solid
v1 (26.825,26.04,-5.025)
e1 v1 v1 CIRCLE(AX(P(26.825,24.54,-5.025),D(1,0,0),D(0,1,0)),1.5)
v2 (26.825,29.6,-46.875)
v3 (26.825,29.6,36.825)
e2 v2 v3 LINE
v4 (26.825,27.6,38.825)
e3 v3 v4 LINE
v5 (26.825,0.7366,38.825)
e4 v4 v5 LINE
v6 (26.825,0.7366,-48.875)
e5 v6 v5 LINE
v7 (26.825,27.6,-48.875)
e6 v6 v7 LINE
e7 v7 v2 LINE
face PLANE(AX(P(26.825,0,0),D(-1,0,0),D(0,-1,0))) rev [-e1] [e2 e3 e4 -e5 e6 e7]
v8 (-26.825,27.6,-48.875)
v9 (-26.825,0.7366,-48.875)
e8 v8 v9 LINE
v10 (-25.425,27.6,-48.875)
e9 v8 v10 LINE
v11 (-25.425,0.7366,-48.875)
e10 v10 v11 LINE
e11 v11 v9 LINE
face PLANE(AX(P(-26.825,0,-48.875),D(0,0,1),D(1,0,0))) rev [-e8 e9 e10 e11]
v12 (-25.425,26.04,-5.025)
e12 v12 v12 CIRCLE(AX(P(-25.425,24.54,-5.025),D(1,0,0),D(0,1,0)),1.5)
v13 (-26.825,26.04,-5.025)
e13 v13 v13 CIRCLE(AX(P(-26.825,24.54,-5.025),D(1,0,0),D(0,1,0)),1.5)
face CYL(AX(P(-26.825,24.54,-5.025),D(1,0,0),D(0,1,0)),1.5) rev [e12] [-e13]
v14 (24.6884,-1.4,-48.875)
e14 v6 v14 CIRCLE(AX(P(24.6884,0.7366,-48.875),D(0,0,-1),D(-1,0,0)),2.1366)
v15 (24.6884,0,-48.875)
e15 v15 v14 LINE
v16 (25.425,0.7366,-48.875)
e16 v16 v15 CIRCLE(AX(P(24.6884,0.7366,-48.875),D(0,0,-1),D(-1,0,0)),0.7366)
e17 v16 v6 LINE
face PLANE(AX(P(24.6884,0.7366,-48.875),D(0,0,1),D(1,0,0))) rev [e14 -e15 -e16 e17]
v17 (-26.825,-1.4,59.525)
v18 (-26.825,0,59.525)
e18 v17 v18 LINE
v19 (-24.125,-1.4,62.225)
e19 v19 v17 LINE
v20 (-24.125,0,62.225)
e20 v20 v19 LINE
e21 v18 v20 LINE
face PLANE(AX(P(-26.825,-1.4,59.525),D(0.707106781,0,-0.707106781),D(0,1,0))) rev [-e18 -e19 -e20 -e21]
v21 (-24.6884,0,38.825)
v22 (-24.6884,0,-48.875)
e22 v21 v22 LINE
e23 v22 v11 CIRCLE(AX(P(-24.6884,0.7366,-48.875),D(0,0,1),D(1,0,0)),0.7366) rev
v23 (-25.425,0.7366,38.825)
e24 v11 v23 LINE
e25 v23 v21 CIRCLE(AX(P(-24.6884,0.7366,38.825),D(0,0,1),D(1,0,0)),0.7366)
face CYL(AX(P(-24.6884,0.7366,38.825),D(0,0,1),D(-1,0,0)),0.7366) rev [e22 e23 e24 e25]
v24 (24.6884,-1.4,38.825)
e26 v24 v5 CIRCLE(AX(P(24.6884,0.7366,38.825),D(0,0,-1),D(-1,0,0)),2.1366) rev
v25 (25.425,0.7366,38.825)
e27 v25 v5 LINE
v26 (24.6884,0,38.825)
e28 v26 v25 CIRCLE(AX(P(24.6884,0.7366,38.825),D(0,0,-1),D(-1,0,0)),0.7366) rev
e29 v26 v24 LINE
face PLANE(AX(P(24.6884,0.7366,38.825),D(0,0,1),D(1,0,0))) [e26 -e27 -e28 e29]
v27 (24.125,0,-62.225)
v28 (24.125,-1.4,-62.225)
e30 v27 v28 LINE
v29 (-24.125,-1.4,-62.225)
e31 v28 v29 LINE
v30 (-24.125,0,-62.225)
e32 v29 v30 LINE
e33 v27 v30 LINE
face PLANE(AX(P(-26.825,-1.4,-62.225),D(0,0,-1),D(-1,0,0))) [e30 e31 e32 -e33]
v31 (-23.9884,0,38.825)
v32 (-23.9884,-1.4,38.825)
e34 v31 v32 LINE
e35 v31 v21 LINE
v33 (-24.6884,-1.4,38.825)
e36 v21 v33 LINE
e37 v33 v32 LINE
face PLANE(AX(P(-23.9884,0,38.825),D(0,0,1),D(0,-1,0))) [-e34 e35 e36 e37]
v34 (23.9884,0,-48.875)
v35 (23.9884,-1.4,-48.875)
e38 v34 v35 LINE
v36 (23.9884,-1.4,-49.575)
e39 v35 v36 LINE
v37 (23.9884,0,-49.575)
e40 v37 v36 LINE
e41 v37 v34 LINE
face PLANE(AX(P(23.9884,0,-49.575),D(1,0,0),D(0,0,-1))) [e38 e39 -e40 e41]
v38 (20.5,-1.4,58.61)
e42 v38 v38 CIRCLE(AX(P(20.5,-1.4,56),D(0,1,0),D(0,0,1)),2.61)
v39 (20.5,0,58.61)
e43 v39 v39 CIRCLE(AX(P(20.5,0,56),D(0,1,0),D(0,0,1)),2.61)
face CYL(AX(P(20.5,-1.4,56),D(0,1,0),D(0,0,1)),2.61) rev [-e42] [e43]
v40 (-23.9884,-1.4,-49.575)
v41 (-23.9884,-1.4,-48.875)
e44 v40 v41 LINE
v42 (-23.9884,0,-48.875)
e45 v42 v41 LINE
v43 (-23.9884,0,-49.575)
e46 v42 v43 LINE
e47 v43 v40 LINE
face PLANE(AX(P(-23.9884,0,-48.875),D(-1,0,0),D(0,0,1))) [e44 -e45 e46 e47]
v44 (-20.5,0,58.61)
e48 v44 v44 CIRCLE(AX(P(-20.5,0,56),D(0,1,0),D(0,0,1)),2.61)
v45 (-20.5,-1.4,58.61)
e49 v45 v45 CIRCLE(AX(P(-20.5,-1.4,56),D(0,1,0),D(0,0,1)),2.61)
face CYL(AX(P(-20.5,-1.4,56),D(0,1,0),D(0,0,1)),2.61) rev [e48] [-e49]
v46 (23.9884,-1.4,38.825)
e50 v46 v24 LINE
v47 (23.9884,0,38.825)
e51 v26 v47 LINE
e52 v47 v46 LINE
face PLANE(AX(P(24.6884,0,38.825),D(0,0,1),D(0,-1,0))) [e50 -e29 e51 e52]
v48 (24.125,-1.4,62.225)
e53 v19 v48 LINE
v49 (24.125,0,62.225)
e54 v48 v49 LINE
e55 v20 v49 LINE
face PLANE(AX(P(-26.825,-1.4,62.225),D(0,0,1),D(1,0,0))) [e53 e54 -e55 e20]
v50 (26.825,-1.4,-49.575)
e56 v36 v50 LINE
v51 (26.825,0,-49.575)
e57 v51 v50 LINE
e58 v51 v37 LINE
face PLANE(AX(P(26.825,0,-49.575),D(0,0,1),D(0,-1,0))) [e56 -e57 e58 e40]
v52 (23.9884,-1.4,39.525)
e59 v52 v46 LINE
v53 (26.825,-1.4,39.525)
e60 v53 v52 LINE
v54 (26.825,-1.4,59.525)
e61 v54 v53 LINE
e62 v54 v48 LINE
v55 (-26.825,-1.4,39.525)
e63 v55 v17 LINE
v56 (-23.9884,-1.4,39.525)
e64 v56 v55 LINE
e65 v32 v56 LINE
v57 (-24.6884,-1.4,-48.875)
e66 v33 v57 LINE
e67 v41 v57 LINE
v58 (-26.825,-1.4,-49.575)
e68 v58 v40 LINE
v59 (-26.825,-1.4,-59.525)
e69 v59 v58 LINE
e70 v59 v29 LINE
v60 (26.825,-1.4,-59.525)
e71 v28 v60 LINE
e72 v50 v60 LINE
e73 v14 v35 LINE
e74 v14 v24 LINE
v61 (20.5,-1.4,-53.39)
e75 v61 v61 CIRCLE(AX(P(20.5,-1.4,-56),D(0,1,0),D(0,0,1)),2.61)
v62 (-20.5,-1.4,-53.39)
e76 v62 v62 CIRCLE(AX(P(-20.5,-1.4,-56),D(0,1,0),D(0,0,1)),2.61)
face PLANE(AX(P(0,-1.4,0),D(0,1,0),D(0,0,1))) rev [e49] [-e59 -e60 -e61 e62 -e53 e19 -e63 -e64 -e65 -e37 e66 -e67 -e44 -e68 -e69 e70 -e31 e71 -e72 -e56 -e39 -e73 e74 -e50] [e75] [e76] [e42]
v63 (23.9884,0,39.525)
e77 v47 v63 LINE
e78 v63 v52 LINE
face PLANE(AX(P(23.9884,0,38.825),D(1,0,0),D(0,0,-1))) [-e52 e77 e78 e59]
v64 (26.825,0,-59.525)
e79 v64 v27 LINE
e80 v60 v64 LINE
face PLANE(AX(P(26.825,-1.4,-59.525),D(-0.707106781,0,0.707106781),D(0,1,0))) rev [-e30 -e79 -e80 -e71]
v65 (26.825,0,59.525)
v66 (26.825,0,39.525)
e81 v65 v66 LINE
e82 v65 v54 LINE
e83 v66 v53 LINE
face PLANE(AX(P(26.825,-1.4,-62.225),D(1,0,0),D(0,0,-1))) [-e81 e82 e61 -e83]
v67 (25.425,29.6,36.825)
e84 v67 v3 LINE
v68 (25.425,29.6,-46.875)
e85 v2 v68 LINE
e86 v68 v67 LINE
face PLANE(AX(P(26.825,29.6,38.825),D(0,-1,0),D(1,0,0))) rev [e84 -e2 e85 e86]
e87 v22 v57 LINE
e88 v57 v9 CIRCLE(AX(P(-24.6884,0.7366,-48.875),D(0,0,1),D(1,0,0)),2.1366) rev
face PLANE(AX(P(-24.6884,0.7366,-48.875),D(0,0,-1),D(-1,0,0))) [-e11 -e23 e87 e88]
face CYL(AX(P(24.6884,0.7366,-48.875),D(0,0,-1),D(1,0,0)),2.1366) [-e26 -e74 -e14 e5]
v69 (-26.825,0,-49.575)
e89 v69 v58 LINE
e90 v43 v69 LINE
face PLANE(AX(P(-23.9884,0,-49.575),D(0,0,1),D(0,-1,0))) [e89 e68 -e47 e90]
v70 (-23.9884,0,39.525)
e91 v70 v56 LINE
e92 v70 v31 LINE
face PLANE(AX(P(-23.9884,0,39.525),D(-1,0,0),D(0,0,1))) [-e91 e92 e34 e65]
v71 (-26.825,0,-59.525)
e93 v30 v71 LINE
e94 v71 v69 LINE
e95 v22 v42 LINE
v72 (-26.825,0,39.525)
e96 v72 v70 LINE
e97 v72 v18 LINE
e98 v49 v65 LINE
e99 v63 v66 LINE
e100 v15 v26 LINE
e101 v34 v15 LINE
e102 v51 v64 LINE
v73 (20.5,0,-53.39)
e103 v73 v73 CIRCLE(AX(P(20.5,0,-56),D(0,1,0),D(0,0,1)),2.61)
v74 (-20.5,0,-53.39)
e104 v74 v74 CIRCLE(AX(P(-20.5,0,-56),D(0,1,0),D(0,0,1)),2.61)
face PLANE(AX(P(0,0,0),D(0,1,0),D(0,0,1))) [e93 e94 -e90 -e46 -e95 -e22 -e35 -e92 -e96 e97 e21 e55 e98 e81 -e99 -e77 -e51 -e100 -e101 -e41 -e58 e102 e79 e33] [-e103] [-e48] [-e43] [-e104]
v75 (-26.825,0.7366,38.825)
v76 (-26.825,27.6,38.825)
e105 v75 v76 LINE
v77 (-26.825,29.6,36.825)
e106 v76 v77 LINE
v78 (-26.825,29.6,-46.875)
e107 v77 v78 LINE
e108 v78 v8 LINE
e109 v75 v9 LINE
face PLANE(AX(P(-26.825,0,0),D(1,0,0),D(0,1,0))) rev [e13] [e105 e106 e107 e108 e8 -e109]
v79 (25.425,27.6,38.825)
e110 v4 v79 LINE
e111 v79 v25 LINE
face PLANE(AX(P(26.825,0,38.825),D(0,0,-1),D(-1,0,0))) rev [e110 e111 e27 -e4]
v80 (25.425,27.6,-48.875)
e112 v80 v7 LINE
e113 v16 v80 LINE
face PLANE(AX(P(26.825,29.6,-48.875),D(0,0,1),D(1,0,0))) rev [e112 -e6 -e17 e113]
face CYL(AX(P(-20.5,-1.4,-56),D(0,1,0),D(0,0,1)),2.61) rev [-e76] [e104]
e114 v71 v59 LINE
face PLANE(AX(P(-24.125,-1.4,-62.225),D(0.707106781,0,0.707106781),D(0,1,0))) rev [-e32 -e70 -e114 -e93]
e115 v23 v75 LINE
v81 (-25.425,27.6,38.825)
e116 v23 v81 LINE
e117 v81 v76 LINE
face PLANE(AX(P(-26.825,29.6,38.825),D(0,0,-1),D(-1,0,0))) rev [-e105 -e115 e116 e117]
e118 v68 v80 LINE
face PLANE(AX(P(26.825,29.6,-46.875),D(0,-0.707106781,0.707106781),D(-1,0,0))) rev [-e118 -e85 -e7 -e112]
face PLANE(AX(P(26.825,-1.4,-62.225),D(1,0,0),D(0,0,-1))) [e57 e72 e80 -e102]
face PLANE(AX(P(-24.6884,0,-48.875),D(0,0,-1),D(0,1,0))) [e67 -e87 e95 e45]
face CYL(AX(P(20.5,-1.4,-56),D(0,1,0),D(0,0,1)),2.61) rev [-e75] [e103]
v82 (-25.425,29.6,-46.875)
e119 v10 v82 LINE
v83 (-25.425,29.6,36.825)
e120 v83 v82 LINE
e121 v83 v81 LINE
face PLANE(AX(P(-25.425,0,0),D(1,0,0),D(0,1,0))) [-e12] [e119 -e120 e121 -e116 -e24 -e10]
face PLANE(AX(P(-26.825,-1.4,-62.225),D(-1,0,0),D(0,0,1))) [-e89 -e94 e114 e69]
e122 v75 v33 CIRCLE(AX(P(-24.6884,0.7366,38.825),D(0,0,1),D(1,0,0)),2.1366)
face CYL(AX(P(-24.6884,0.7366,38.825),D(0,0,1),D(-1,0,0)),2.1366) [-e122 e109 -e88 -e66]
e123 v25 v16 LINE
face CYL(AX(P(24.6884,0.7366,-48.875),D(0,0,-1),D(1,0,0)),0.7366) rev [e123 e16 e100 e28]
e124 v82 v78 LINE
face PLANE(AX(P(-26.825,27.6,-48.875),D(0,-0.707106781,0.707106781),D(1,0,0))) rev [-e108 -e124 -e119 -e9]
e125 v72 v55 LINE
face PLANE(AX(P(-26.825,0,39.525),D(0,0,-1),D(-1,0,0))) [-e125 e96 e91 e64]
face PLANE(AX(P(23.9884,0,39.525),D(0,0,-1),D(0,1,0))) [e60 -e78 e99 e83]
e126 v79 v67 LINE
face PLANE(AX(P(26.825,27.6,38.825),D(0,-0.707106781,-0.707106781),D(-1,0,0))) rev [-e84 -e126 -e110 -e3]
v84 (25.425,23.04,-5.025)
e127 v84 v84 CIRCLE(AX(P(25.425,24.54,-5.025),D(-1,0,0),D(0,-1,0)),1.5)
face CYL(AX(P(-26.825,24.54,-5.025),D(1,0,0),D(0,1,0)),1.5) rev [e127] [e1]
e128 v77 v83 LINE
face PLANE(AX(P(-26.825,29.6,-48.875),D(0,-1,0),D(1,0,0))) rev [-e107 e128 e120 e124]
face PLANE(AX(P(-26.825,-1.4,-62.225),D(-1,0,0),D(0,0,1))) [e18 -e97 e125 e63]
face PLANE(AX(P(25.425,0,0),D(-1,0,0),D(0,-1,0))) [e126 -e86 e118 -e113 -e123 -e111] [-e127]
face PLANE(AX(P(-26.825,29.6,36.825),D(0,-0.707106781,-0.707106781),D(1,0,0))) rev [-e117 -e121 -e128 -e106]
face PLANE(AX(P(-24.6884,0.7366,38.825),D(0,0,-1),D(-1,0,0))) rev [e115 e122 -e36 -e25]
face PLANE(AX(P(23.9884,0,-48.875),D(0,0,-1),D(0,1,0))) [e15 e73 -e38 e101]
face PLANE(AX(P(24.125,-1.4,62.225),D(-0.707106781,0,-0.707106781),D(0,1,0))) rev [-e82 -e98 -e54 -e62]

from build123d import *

# Parameters (mm, degrees)
SKETCH1_W                       = 53.65
SKETCH1_H                       = 124.45
SKETCH1_R                       = 2.61
BASE_FLANGE1_DEPTH              = 1.4
CHAMFER1_SIZE                   = 2.7
EDGE_FLANGE2_STRIP_W            = 7.0732
EDGE_FLANGE2_STRIP_H            = 1.4
EDGE_FLANGE2_STRIP_CUT_DEPTH    = 87.7
EDGE_FLANGE2_RELIEF_W           = 7.7732
EDGE_FLANGE2_RELIEF_H           = 0.7
EDGE_FLANGE2_RELIEF_CUT_DEPTH   = 1.4
EDGE_FLANGE2_STRIP_2_W          = 7.0732
EDGE_FLANGE2_STRIP_2_H          = 1.4
EDGE_FLANGE2_STRIP_CUT_2_DEPTH  = 87.7
EDGE_FLANGE2_RELIEF_2_W         = 7.7732
EDGE_FLANGE2_RELIEF_2_H         = 0.7
EDGE_FLANGE2_RELIEF_CUT_2_DEPTH = 1.4
EDGE_FLANGE2_DEPTH              = 87.7
EDGE_FLANGE2_BEND_DEPTH         = 87.7
CHAMFER2_SIZE                   = 2
SKETCH18_R                      = 1.5
CUT_EXTRUDE1_DEPTH              = 88.329451647


# Sheet-metal steps are written as plain solids
with BuildPart() as part:
    # Sketch1 → Base-Flange1 (new body)
    with BuildSketch(Plane(origin=(0, 0, 0), x_dir=(1, 0, 0), z_dir=(0, 1, 0))):
        Rectangle(SKETCH1_W, SKETCH1_H)
        with Locations(Location((-20.5, 56, 0), (0, 0, 270))):
            Circle(SKETCH1_R, mode=Mode.SUBTRACT)
        with Locations(Location((20.5, 56, 0), (0, 0, 270))):
            Circle(SKETCH1_R, mode=Mode.SUBTRACT)
        with Locations(Location((20.5, -56, 0), (0, 0, 270))):
            Circle(SKETCH1_R, mode=Mode.SUBTRACT)
        with Locations(Location((-20.5, -56, 0), (0, 0, 270))):
            Circle(SKETCH1_R, mode=Mode.SUBTRACT)
    extrude(amount=-BASE_FLANGE1_DEPTH)

    # Chamfer1
    chamfer1_edges = [part.edges().sort_by_distance(p)[0] for p in [
        (26.825, -0.7, 62.225),
        (-26.825, -0.7, 62.225),
        (-26.825, -0.7, -62.225),
        (26.825, -0.7, -62.225),
    ]]
    chamfer(chamfer1_edges, length=CHAMFER1_SIZE)

    # Edge-Flange2 strip (across the edge) → Edge-Flange2 strip cut (cut)
    with BuildSketch(Plane(origin=(26.825, 0, 38.825), x_dir=(-1, 0, 0), z_dir=(0, 0, -1))):
        with Locations((-1.4, -0.7)):
            Rectangle(EDGE_FLANGE2_STRIP_W, EDGE_FLANGE2_STRIP_H)
    extrude(amount=EDGE_FLANGE2_STRIP_CUT_DEPTH, mode=Mode.SUBTRACT)

    # Edge-Flange2 relief (on the sheet) → Edge-Flange2 relief cut (cut)
    with BuildSketch(Plane(origin=(24.6884, 0, 38.825), x_dir=(-1, 0, 0), z_dir=(0, 1, 0))):
        with Locations((-3.1866, 0.35)):
            Rectangle(EDGE_FLANGE2_RELIEF_W, EDGE_FLANGE2_RELIEF_H)
        with Locations((-3.1866, -88.05)):
            Rectangle(EDGE_FLANGE2_RELIEF_W, EDGE_FLANGE2_RELIEF_H)
    extrude(amount=-EDGE_FLANGE2_RELIEF_CUT_DEPTH, mode=Mode.SUBTRACT)

    # Edge-Flange2 strip 2 (across the edge) → Edge-Flange2 strip cut 2 (cut)
    with BuildSketch(Plane(origin=(-26.825, 0, -48.875), x_dir=(1, 0, 0), z_dir=(0, 0, 1))):
        with Locations((-1.4, -0.7)):
            Rectangle(EDGE_FLANGE2_STRIP_2_W, EDGE_FLANGE2_STRIP_2_H)
    extrude(amount=EDGE_FLANGE2_STRIP_CUT_2_DEPTH, mode=Mode.SUBTRACT)

    # Edge-Flange2 relief 2 (on the sheet) → Edge-Flange2 relief cut 2 (cut)
    with BuildSketch(Plane(origin=(-24.6884, 0, -48.875), x_dir=(1, 0, 0), z_dir=(0, 1, 0))):
        with Locations((-3.1866, 0.35)):
            Rectangle(EDGE_FLANGE2_RELIEF_2_W, EDGE_FLANGE2_RELIEF_2_H)
        with Locations((-3.1866, -88.05)):
            Rectangle(EDGE_FLANGE2_RELIEF_2_W, EDGE_FLANGE2_RELIEF_2_H)
    extrude(amount=-EDGE_FLANGE2_RELIEF_CUT_2_DEPTH, mode=Mode.SUBTRACT)

    # Edge-Flange2 section (across the edge) → Edge-Flange2 (add)
    with BuildSketch(Plane(origin=(26.825, 0, 38.825), x_dir=(-1, 0, 0), z_dir=(0, 0, -1))):
        with BuildLine():
            Line((0, 0.7366), (0, 29.6))
            Line((0, 29.6), (1.4, 29.6))
            Line((1.4, 29.6), (1.4, 0.7366))
            ThreePointArc((1.4, 0.7366), (1.615745145, 0.215745145), (2.1366, 0))
            Line((2.1366, 0), (2.1366, -1.4))
            ThreePointArc((2.1366, -1.4), (0.625795651, -0.774204349), (0, 0.7366))
        make_face()
    extrude(amount=EDGE_FLANGE2_DEPTH)

    # Edge-Flange2 section 2 (across the edge) → Edge-Flange2 bend (add)
    with BuildSketch(Plane(origin=(-26.825, 0, -48.875), x_dir=(1, 0, 0), z_dir=(0, 0, 1))):
        with BuildLine():
            Line((0, 0.7366), (0, 29.6))
            Line((0, 29.6), (1.4, 29.6))
            Line((1.4, 29.6), (1.4, 0.7366))
            ThreePointArc((1.4, 0.7366), (1.615745145, 0.215745145), (2.1366, 0))
            Line((2.1366, 0), (2.1366, -1.4))
            ThreePointArc((2.1366, -1.4), (0.625795651, -0.774204349), (0, 0.7366))
        make_face()
    extrude(amount=EDGE_FLANGE2_BEND_DEPTH)

    # Chamfer2
    chamfer2_edges = [part.edges().sort_by_distance(p)[0] for p in [
        (26.125, 29.6, 38.825),
        (26.125, 29.6, -48.875),
        (-26.125, 29.6, -48.875),
        (-26.125, 29.6, 38.825),
    ]]
    chamfer(chamfer2_edges, length=CHAMFER2_SIZE)

    # Sketch18 → Cut-Extrude1 (cut, through all)
    with BuildSketch(Plane(origin=(26.825, 0, 0), x_dir=(0, 0, -1), z_dir=(1, 0, 0))):
        with Locations(Location((5.025, 24.54, 0), (0, 0, 90))):
            Circle(SKETCH18_R)
    extrude(amount=-CUT_EXTRUDE1_DEPTH, mode=Mode.SUBTRACT)


solid = part.part
